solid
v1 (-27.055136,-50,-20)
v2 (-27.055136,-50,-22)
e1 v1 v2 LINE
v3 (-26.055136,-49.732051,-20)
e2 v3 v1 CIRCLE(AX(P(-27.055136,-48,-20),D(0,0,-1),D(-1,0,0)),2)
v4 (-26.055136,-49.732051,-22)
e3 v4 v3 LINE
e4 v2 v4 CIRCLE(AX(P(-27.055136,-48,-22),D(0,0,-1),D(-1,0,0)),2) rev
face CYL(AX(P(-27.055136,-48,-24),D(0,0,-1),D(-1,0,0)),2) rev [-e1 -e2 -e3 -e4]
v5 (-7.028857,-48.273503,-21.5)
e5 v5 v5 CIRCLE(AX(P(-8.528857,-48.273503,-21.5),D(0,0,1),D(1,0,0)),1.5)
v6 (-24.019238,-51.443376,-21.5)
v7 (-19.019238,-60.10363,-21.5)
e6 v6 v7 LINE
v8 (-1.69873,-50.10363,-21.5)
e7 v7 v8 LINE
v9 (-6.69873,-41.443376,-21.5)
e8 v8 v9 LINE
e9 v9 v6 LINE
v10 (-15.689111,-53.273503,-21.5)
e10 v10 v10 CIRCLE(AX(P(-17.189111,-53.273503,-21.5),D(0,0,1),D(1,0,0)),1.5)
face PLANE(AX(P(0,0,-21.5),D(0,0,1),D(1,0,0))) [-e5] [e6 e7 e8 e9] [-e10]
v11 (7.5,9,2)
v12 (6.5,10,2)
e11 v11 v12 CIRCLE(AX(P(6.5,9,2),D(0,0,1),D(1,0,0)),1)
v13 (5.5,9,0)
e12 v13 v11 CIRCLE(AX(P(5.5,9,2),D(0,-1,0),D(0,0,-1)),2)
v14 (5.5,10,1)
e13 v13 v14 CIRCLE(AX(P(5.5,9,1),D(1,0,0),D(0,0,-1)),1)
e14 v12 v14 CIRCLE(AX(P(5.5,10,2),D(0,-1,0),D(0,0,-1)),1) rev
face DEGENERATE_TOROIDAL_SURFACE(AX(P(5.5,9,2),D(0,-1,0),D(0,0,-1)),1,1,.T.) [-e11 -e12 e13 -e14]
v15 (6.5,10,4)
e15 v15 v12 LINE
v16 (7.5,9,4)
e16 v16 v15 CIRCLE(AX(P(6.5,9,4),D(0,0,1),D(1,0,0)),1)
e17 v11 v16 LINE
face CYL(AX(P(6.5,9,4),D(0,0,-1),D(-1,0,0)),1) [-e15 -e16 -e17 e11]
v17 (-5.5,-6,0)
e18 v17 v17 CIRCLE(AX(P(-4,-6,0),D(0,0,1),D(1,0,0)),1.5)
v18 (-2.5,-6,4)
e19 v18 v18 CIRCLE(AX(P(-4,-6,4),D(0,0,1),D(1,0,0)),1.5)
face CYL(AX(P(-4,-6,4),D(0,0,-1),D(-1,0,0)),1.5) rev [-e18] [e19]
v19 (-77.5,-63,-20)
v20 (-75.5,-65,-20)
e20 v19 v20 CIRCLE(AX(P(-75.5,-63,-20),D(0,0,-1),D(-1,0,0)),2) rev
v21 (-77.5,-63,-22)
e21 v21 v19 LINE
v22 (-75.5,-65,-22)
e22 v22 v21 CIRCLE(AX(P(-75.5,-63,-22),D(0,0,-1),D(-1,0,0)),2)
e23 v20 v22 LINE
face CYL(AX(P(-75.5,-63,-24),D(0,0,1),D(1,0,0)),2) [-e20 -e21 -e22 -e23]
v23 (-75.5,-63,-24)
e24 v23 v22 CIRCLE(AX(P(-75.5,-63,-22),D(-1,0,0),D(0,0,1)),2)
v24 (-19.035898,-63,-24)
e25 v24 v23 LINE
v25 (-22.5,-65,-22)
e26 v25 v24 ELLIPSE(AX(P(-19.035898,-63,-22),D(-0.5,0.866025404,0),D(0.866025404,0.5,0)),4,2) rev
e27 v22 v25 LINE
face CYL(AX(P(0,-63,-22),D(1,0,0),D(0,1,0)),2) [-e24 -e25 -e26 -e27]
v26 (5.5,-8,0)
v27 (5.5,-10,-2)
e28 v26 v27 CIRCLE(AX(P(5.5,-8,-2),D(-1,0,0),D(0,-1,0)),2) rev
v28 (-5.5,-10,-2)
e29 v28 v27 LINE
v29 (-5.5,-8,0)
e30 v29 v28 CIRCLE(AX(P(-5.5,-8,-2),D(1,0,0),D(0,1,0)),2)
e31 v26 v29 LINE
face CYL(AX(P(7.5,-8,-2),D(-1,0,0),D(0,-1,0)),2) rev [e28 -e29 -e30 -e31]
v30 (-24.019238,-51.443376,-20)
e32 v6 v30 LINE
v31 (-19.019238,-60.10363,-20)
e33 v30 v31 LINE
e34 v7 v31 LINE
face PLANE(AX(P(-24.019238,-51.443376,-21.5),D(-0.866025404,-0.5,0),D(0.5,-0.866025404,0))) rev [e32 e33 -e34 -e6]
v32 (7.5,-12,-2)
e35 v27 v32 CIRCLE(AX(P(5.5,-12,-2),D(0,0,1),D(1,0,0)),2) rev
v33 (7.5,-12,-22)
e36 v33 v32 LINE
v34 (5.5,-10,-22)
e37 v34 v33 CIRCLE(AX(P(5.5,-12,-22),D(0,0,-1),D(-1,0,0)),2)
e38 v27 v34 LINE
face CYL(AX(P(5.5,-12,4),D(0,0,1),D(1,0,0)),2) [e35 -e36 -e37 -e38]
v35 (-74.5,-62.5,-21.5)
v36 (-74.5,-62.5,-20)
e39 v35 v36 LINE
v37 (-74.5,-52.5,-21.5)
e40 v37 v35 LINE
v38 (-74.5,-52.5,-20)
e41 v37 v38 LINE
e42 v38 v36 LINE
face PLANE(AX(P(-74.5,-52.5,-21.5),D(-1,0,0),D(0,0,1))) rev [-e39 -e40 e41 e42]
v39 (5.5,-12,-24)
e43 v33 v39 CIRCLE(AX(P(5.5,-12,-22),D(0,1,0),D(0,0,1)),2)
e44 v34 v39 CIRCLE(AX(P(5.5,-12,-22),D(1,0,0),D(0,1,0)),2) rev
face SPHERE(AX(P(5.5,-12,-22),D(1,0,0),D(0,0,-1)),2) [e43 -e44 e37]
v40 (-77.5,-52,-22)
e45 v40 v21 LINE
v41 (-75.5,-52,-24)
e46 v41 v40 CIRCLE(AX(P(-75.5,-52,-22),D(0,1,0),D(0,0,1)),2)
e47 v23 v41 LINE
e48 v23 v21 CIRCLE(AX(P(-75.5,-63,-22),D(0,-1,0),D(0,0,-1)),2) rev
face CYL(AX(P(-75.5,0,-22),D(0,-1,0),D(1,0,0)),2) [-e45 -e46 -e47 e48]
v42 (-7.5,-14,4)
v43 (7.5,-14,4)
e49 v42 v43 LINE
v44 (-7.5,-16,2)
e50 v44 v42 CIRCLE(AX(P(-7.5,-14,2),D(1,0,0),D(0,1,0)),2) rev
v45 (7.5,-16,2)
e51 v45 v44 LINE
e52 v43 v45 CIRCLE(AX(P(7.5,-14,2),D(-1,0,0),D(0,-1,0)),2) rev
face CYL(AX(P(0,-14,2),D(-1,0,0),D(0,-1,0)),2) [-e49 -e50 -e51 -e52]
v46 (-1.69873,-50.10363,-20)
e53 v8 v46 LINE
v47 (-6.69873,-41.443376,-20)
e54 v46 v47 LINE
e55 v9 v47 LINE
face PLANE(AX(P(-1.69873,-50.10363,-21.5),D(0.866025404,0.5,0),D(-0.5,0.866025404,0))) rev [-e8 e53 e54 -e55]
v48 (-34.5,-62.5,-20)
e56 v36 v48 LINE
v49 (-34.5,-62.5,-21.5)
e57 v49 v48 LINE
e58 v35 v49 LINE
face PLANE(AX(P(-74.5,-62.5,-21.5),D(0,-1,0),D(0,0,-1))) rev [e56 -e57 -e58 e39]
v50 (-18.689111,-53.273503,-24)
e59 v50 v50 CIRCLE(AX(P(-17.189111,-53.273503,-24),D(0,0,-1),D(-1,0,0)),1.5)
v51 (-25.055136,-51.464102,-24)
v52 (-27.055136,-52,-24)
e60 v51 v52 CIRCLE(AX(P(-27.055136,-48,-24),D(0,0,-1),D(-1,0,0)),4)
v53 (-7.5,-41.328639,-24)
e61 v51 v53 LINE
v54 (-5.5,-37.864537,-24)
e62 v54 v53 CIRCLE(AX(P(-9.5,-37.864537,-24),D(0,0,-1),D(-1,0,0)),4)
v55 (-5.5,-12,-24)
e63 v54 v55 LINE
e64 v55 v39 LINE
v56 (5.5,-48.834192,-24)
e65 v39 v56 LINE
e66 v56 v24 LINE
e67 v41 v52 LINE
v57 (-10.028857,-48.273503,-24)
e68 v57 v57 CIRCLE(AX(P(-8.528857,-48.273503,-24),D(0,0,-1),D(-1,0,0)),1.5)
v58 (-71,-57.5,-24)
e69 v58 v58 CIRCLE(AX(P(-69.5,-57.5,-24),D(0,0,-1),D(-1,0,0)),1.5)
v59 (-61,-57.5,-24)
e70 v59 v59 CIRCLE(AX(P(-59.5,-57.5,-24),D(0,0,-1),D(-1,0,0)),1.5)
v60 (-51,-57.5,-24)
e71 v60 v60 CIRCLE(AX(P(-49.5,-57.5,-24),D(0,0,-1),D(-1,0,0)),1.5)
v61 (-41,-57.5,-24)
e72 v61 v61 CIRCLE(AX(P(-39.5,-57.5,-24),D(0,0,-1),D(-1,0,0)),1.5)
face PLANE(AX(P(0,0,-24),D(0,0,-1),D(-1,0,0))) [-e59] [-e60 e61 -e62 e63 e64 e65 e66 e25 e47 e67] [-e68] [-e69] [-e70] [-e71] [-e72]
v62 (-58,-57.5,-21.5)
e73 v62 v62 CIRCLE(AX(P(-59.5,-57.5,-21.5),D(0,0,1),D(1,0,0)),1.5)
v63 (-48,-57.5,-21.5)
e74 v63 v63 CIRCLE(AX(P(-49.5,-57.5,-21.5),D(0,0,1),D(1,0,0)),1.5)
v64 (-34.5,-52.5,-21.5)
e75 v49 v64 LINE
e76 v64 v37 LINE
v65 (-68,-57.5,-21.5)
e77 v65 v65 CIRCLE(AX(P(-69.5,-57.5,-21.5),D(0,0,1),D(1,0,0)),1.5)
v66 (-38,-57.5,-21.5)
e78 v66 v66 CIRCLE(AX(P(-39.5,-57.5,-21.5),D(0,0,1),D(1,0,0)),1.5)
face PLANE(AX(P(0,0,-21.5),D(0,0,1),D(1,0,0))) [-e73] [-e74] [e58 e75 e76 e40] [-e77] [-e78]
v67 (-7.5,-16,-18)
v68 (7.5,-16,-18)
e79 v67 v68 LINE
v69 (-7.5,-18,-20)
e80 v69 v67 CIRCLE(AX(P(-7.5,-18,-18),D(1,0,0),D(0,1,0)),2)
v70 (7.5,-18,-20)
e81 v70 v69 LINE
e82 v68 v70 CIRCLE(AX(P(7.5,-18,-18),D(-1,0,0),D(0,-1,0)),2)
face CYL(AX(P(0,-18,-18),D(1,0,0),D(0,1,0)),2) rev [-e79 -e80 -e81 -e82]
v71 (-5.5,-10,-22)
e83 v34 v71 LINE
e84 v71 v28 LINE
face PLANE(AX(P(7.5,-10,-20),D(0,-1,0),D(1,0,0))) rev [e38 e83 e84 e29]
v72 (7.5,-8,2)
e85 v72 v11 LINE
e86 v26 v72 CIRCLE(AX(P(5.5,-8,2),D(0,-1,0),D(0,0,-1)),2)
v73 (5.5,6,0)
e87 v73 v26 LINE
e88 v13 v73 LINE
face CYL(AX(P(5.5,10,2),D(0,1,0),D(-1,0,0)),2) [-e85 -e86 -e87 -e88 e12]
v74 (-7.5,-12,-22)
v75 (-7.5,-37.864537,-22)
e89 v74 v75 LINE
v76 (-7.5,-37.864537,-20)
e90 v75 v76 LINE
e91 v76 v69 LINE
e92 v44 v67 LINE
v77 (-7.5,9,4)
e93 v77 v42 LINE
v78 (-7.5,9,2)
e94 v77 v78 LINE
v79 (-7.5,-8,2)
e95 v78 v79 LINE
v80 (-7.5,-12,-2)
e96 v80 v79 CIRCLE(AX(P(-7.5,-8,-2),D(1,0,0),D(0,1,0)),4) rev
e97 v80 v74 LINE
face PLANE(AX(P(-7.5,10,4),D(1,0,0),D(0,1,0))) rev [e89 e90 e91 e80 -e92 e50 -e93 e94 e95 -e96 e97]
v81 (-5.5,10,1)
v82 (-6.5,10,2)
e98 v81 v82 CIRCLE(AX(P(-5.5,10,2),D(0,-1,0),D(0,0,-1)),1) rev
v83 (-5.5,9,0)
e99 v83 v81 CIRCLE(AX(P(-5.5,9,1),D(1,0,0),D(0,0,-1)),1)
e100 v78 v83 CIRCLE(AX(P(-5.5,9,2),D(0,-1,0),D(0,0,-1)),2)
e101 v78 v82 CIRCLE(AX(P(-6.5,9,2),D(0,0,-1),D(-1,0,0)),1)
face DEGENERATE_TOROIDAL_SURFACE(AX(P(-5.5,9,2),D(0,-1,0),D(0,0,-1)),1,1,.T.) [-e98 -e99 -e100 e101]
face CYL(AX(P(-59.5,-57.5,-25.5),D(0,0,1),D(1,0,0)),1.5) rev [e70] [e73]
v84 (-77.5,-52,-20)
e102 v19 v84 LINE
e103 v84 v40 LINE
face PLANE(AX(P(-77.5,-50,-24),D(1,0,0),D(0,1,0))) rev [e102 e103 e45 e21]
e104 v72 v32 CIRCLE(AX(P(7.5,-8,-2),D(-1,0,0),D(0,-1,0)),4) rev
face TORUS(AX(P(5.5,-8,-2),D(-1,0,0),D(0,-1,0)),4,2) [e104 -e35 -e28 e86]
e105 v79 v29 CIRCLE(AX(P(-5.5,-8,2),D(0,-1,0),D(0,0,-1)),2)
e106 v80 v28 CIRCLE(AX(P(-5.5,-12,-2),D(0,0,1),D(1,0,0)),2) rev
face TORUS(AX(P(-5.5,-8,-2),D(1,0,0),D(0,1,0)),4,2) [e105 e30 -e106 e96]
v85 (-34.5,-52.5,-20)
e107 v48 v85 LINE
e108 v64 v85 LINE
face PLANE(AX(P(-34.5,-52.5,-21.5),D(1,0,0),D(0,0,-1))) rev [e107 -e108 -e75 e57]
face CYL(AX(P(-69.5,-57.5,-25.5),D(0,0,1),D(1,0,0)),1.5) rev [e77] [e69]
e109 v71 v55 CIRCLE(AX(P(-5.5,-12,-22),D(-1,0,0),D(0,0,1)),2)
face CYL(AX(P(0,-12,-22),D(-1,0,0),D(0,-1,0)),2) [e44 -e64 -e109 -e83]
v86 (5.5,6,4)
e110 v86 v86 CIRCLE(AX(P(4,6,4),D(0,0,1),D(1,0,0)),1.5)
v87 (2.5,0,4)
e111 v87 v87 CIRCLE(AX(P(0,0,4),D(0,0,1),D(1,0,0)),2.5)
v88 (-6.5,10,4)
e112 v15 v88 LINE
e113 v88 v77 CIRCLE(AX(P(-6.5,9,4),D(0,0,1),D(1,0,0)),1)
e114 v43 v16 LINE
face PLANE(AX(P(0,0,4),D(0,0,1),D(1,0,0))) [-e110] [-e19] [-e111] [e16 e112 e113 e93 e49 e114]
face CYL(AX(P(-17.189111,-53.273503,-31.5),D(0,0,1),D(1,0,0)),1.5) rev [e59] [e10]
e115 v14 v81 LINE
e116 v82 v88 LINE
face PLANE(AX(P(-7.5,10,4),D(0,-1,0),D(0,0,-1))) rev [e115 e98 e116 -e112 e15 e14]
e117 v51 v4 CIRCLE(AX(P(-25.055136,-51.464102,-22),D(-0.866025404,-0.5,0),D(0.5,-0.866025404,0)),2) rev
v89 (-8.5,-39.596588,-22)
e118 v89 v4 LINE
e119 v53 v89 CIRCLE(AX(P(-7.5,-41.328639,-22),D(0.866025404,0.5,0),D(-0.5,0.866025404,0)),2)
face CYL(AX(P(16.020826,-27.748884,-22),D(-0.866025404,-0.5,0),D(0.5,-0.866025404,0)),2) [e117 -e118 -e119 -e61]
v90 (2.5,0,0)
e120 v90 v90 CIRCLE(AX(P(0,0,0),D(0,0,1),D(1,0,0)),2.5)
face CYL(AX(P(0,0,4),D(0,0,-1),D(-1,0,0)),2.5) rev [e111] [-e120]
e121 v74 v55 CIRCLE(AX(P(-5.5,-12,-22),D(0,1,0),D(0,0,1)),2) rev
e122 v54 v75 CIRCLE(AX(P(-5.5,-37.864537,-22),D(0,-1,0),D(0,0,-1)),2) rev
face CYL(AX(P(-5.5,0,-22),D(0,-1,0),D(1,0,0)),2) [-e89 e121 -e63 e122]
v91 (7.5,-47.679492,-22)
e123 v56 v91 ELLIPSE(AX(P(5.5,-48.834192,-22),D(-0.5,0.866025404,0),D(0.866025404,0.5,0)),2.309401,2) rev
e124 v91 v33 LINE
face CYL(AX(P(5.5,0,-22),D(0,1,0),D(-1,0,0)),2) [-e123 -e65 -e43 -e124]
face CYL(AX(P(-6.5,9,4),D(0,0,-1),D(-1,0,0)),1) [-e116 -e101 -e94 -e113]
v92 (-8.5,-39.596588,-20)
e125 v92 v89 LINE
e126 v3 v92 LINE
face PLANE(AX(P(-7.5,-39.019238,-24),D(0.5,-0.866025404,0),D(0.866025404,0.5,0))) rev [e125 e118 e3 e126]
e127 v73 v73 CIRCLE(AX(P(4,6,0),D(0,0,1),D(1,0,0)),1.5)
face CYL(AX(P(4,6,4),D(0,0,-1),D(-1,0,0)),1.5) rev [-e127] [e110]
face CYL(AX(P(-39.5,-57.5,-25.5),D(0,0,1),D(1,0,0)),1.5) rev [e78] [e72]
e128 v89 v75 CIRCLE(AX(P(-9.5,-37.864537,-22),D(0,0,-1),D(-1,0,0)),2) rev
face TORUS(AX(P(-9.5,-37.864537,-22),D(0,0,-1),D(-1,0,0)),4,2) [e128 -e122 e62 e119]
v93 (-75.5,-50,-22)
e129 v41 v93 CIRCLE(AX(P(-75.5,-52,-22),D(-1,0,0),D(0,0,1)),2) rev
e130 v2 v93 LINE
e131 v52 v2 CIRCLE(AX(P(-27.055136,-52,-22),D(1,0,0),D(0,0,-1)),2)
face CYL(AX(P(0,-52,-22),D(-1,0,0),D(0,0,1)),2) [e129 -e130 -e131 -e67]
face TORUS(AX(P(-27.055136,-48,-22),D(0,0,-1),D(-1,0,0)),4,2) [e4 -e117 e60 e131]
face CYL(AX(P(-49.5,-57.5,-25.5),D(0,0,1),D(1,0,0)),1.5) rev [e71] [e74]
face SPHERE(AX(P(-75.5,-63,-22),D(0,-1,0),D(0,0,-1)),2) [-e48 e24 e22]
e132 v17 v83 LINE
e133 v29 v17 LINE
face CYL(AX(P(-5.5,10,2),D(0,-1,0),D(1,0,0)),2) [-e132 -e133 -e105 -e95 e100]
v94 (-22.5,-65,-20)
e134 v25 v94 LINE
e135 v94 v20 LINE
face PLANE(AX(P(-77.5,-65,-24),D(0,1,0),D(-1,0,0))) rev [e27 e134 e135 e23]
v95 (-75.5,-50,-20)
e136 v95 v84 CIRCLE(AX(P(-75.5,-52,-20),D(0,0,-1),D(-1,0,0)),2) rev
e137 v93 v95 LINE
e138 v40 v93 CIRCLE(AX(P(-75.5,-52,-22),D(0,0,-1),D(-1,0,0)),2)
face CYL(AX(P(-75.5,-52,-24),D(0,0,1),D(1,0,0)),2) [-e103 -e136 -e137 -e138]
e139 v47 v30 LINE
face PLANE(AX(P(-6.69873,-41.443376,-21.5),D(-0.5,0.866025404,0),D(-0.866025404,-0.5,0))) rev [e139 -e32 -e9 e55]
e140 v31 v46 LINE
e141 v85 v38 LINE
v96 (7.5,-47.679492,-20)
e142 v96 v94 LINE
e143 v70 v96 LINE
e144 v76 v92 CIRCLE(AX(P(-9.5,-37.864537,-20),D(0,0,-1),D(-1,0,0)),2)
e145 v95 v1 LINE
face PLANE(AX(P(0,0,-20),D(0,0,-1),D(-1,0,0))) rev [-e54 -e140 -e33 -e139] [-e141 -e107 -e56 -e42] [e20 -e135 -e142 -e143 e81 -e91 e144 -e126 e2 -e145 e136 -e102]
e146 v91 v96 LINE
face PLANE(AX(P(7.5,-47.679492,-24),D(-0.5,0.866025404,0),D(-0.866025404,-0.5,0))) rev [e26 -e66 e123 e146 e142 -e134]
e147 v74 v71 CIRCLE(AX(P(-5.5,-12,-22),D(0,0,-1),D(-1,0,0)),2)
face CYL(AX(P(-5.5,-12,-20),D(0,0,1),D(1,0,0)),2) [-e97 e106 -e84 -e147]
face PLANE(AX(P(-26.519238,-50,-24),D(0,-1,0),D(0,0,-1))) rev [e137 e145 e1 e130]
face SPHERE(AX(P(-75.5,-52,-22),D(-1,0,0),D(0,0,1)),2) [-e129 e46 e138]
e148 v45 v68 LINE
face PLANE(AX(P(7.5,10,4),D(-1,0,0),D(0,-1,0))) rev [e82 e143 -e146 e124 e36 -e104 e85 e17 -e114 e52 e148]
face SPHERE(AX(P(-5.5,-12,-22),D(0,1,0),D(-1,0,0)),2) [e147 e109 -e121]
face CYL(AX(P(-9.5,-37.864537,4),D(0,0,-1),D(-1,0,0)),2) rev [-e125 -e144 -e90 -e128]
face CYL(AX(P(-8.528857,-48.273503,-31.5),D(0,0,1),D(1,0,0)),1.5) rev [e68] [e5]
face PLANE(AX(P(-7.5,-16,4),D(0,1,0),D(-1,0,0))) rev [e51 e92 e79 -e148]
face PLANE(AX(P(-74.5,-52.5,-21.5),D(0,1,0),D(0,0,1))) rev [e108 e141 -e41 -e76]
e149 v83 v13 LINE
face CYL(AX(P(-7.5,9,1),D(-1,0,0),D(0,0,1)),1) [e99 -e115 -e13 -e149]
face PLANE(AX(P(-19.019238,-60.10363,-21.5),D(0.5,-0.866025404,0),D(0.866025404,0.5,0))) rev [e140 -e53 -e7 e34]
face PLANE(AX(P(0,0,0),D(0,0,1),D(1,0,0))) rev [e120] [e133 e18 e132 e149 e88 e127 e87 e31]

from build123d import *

# Parameters (mm, degrees)
SKETCH_1_W          = 15
SKETCH_1_H          = 26
SKETCH_1_R          = 2.5
SKETCH_1_R_2        = 1.5
EXTRUDE_1_DEPTH     = 4
SKETCH_3_W          = 15
SKETCH_3_H          = 6
EXTRUDE_2_DEPTH     = 20
EXTRUDE_3_DEPTH     = 4
SKETCH_9_W          = 40
SKETCH_9_H          = 10
CUT_EXTRUDE_1_DEPTH = 1.5
SKETCH_10_R         = 1.5
CUT_EXTRUDE_2_DEPTH = 4
CUT_EXTRUDE_3_DEPTH = 1.5
SKETCH_12_R         = 1.5
CUT_EXTRUDE_4_DEPTH = 10
FILLET_1_R          = 2
FILLET_2_R          = 2
FILLET_3_R          = 1


with BuildPart() as part:
    # 草图1 → 凸台-拉伸1 (new body)
    with BuildSketch(Plane.XY):
        with Locations((0, -3)):
            Rectangle(SKETCH_1_W, SKETCH_1_H)
        Circle(SKETCH_1_R, mode=Mode.SUBTRACT)
        with Locations((4, 6)):
            Circle(SKETCH_1_R_2, mode=Mode.SUBTRACT)
        with Locations((-4, -6)):
            Circle(SKETCH_1_R_2, mode=Mode.SUBTRACT)
    extrude(amount=EXTRUDE_1_DEPTH)

    # 草图3 → 凸台-拉伸2 (add)
    with BuildSketch(Plane(origin=(0, 0, 0), x_dir=(-1, 0, 0), z_dir=(0, 0, -1))):
        with Locations((0, -13)):
            Rectangle(SKETCH_3_W, SKETCH_3_H)
    extrude(amount=EXTRUDE_2_DEPTH)

    # 草图8 → 凸台-拉伸3 (add)
    with BuildSketch(Plane(origin=(0, 0, -20), x_dir=(-1, 0, 0), z_dir=(0, 0, -1))):
        Polygon((-7.5, -16), (-7.5, -47.679491924), (22.5, -65), (77.5, -65), (77.5, -50), (26.519237886, -50), (7.5, -39.019237886), (7.5, -16), (7.5, -10), (-7.5, -10), align=None)
    extrude(amount=EXTRUDE_3_DEPTH)

    # 草图9 → 切除-拉伸1 (cut)
    with BuildSketch(Plane.XY.offset(-20)):
        with Locations((-54.5, -57.5)):
            Rectangle(SKETCH_9_W, SKETCH_9_H)
    extrude(amount=-CUT_EXTRUDE_1_DEPTH, mode=Mode.SUBTRACT)

    # 草图10 → 切除-拉伸2 (cut)
    with BuildSketch(Plane.XY.offset(-21.5)):
        with Locations((-69.5, -57.5)):
            Circle(SKETCH_10_R)
        with Locations((-59.5, -57.5)):
            Circle(SKETCH_10_R)
        with Locations((-49.5, -57.5)):
            Circle(SKETCH_10_R)
        with Locations((-39.5, -57.5)):
            Circle(SKETCH_10_R)
    extrude(amount=-CUT_EXTRUDE_2_DEPTH, mode=Mode.SUBTRACT)

    # 草图11 → 切除-拉伸3 (cut)
    with BuildSketch(Plane.XY.offset(-20)):
        Polygon((-6.698729811, -41.443375673), (-24.019237886, -51.443375673), (-19.019237886, -60.103629711), (-1.698729811, -50.103629711), align=None)
    extrude(amount=-CUT_EXTRUDE_3_DEPTH, mode=Mode.SUBTRACT)

    # 草图12 → 切除-拉伸4 (cut)
    with BuildSketch(Plane.XY.offset(-21.5)):
        with Locations((-17.189110868, -53.273502692)):
            Circle(SKETCH_12_R)
        with Locations((-8.52885683, -48.273502692)):
            Circle(SKETCH_12_R)
    extrude(amount=-CUT_EXTRUDE_4_DEPTH, mode=Mode.SUBTRACT)

    # 圆角1
    fillet_1_edges = [part.edges().sort_by_distance(p)[0] for p in [
        (7.5, 0, 0),
        (7.5, -10, -12),
        (0, -10, 0),
        (-7.5, -10, -12),
        (0, -16, -20),
        (-77.5, -65, -22),
        (-77.5, -50, -22),
        (-26.519237886, -50, -22),
        (-7.5, -39.019237886, -22),
        (0, -10, -24),
        (7.5, -28.839745962, -24),
        (-50, -65, -24),
        (-77.5, -57.5, -24),
        (-52.009618943, -50, -24),
        (-17.009618943, -44.509618943, -24),
        (-7.5, -24.509618943, -24),
        (-7.5, 0, 0),
    ]]
    fillet(fillet_1_edges, radius=FILLET_1_R - 0.0001)  # a hair under: the kernel refuses the full size

    # 圆角2
    fillet_2_edges = [part.edges().sort_by_distance(p)[0] for p in [
        (0, -16, 4),
    ]]
    fillet(fillet_2_edges, radius=FILLET_2_R)

    # 圆角3
    fillet_3_edges = [part.edges().sort_by_distance(p)[0] for p in [
        (0, 10, 0),
        (-6.914242852, 10, 0.585757148),
        (6.914242852, 10, 0.585757148),
        (-7.5, 10, 2.99995),
        (7.5, 10, 2.99995),
    ]]
    fillet(fillet_3_edges, radius=FILLET_3_R)


solid = part.part
